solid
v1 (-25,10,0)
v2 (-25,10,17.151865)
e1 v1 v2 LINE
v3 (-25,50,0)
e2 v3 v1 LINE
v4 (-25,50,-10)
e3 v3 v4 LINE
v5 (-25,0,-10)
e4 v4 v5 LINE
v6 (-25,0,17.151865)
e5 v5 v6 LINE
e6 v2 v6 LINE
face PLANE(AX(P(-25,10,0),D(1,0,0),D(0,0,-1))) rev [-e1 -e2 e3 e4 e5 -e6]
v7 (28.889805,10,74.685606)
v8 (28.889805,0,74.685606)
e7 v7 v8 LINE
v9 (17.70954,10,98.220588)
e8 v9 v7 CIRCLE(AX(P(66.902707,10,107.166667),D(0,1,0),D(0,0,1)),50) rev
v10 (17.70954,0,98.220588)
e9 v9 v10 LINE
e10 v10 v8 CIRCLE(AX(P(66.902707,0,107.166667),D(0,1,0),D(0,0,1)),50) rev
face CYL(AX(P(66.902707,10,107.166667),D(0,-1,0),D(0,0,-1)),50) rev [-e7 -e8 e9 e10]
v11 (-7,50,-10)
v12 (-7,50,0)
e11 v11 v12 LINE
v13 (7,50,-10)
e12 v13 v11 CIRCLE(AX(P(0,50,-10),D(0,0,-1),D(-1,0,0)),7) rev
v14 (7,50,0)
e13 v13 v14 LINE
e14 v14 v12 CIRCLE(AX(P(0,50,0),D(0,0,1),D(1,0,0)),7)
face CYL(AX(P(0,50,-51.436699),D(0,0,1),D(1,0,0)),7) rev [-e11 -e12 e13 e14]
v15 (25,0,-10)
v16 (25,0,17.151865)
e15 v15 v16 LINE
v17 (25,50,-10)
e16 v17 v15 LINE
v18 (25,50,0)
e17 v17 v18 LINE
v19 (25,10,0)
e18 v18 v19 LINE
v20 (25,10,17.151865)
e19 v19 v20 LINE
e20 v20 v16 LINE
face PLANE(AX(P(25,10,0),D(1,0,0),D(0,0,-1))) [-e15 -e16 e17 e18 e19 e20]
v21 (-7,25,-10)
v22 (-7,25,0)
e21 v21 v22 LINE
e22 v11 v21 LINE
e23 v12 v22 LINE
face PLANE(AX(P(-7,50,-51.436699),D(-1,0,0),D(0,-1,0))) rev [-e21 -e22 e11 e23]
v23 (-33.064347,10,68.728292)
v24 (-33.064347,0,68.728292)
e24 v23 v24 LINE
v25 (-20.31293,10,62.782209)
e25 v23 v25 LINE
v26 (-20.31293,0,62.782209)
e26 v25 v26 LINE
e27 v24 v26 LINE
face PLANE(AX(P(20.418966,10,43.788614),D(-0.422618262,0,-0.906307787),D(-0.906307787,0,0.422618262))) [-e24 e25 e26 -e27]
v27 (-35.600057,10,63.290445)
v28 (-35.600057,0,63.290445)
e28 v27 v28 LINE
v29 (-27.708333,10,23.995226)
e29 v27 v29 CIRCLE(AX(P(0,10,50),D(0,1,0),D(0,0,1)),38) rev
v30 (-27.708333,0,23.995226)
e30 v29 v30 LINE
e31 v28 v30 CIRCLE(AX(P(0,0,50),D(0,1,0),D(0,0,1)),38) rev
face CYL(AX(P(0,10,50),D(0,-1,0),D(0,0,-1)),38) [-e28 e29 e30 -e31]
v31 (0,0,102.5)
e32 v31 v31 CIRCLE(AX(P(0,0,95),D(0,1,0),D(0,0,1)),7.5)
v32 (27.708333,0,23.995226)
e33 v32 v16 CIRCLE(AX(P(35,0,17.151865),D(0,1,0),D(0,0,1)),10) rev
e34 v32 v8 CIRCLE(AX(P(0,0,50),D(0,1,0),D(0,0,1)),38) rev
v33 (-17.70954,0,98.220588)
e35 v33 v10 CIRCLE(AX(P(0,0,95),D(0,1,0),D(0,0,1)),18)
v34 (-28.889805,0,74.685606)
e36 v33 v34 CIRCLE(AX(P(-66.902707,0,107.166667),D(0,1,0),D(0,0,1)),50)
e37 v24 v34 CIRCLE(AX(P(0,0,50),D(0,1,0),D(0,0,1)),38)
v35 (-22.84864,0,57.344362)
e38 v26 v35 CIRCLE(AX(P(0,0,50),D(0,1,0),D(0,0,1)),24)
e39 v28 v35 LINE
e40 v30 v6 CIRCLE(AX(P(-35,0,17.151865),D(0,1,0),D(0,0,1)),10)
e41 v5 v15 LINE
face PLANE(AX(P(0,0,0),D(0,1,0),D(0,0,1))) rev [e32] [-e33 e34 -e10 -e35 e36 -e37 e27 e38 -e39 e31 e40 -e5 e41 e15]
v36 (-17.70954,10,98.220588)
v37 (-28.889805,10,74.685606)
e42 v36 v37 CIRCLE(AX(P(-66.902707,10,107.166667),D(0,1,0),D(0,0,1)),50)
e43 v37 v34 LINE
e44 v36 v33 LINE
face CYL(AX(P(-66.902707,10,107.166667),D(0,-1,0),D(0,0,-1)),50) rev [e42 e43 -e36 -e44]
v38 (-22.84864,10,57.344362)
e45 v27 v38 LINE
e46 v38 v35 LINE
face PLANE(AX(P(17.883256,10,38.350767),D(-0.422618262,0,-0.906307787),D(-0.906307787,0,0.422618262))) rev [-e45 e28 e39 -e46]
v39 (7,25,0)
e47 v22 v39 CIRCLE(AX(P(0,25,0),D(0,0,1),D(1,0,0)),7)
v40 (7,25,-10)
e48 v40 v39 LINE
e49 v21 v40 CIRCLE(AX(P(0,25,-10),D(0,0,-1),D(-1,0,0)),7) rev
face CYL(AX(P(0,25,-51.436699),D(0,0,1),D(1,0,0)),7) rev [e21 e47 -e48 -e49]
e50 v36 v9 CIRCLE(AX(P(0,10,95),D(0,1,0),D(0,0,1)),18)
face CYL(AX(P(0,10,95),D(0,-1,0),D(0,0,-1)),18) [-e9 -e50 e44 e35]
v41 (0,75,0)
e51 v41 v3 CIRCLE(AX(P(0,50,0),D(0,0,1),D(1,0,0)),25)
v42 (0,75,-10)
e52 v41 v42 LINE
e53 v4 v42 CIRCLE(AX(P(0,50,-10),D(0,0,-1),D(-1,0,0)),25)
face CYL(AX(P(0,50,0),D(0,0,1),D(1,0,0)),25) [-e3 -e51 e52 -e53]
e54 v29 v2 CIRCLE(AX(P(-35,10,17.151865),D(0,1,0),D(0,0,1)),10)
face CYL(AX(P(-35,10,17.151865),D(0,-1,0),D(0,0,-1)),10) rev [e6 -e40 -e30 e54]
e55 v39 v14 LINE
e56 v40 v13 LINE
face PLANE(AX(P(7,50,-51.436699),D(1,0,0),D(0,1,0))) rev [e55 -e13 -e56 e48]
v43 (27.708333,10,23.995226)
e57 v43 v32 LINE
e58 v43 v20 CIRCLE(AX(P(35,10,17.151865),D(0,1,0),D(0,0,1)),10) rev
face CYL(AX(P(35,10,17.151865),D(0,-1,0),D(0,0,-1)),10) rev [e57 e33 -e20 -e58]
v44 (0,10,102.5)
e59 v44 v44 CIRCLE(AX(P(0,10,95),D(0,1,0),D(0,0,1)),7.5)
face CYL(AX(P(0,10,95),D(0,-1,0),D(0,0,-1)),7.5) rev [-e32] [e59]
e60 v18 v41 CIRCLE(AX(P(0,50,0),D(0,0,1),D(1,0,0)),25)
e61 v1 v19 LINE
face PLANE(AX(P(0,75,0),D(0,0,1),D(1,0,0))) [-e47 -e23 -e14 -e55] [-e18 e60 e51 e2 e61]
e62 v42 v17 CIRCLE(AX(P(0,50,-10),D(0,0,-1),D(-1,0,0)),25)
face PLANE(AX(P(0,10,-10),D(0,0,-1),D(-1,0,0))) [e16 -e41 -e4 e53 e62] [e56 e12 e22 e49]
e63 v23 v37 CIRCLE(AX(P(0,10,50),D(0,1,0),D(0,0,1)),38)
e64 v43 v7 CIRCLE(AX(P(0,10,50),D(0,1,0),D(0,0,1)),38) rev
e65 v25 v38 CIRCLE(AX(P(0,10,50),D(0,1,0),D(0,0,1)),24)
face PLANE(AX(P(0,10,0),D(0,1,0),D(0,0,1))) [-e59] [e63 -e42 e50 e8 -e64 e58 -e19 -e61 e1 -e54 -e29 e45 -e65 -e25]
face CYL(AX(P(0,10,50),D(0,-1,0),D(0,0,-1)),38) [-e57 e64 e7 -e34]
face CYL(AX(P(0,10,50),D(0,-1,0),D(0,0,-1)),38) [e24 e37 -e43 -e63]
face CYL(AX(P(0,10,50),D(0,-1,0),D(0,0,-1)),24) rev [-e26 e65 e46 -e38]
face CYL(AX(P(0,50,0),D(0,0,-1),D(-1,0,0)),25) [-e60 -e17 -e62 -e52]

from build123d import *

# Parameters (mm, degrees)
SKETCH1_W           = 50
SKETCH1_H           = 10
SKETCH1_R           = 7.5
BOSS_EXTRUDE1_DEPTH = 10
SKETCH1_3_W         = 50
SKETCH1_3_H         = 10
BOSS_EXTRUDE2_DEPTH = 75
CUT_EXTRUDE1_DEPTH  = 10
FILLET1_R           = 25


with BuildPart() as part:
    # Sketch1 → Boss-Extrude1 (new body)
    # profile 1 of 3: a face of its own
    with BuildSketch(Plane(origin=(0, 0, 0), x_dir=(1, 0, 0), z_dir=(0, 1, 0))):
        with BuildLine():
            Line((25, -17.151864589), (25, 0))
            Line((25, 0), (-25, 0))
            Line((-25, 0), (-25, -17.151864589))
            ThreePointArc((-25, -17.151864589), (-25.701702665, -20.83176495), (-27.708333333, -23.995226133))
            ThreePointArc((-27.708333333, -23.995226133), (0, -12), (27.708333333, -23.995226133))
            ThreePointArc((27.708333333, -23.995226133), (25.701702665, -20.83176495), (25, -17.151864589))
        make_face()
    # profile 2 of 3: a face of its own
    with BuildSketch(Plane(origin=(0, 0, 0), x_dir=(1, 0, 0), z_dir=(0, 1, 0))):
        with Locations((0, 5)):
            Rectangle(SKETCH1_W, SKETCH1_H)
    # profile 3 of 3: a face of its own
    with BuildSketch(Plane(origin=(0, 0, 0), x_dir=(1, 0, 0), z_dir=(0, 1, 0))):
        with BuildLine():
            ThreePointArc((35.600057015, -63.29044546), (37.256095308, -42.517796957), (27.708333333, -23.995226133))
            ThreePointArc((27.708333333, -23.995226133), (0, -12), (-27.708333333, -23.995226133))
            ThreePointArc((-27.708333333, -23.995226133), (-37.256095308, -42.517796957), (-35.600057015, -63.29044546))
            Line((-35.600057015, -63.29044546), (-22.848639927, -57.34436202))
            ThreePointArc((-22.848639927, -57.34436202), (21.751386889, -39.857161718), (-20.312930357, -62.782208742))
            Line((-20.312930357, -62.782208742), (-33.064347445, -68.728292182))
            ThreePointArc((-33.064347445, -68.728292182), (-31.119955968, -71.807070885), (-28.889805354, -74.685606061))
            ThreePointArc((-28.889805354, -74.685606061), (-21.739686255, -85.712027428), (-17.709540124, -98.220588235))
            ThreePointArc((-17.709540124, -98.220588235), (0, -113), (17.709540124, -98.220588235))
            ThreePointArc((17.709540124, -98.220588235), (21.739686255, -85.712027428), (28.889805354, -74.685606061))
            ThreePointArc((28.889805354, -74.685606061), (31.119955968, -71.807070885), (33.064347445, -68.728292182))
            ThreePointArc((33.064347445, -68.728292182), (34.439695907, -66.059493946), (35.600057015, -63.29044546))
        make_face()
        with Locations(Location((0, -95, 0), (0, 0, 270))):
            Circle(SKETCH1_R, mode=Mode.SUBTRACT)
    extrude(amount=BOSS_EXTRUDE1_DEPTH)

    # Sketch1<3> → Boss-Extrude2 (add)
    with BuildSketch(Plane(origin=(0, 0, 0), x_dir=(1, 0, 0), z_dir=(0, 1, 0))):
        with Locations((0, 5)):
            Rectangle(SKETCH1_3_W, SKETCH1_3_H)
    extrude(amount=BOSS_EXTRUDE2_DEPTH)

    # Sketch2 → Cut-Extrude1 (cut)
    with BuildSketch(Plane.XY):
        with BuildLine():
            Line((7, 50), (7, 25))
            ThreePointArc((7, 25), (0, 18), (-7, 25))
            Line((-7, 25), (-7, 50))
            ThreePointArc((-7, 50), (0, 57), (7, 50))
        make_face()
    extrude(amount=-CUT_EXTRUDE1_DEPTH, mode=Mode.SUBTRACT)

    # Fillet1
    fillet1_edges = [part.edges().sort_by_distance(p)[0] for p in [
        (-25, 75, -5),
        (25, 75, -5),
    ]]
    fillet(fillet1_edges, radius=FILLET1_R - 0.0001)  # a hair under: the kernel refuses the full size


solid = part.part
